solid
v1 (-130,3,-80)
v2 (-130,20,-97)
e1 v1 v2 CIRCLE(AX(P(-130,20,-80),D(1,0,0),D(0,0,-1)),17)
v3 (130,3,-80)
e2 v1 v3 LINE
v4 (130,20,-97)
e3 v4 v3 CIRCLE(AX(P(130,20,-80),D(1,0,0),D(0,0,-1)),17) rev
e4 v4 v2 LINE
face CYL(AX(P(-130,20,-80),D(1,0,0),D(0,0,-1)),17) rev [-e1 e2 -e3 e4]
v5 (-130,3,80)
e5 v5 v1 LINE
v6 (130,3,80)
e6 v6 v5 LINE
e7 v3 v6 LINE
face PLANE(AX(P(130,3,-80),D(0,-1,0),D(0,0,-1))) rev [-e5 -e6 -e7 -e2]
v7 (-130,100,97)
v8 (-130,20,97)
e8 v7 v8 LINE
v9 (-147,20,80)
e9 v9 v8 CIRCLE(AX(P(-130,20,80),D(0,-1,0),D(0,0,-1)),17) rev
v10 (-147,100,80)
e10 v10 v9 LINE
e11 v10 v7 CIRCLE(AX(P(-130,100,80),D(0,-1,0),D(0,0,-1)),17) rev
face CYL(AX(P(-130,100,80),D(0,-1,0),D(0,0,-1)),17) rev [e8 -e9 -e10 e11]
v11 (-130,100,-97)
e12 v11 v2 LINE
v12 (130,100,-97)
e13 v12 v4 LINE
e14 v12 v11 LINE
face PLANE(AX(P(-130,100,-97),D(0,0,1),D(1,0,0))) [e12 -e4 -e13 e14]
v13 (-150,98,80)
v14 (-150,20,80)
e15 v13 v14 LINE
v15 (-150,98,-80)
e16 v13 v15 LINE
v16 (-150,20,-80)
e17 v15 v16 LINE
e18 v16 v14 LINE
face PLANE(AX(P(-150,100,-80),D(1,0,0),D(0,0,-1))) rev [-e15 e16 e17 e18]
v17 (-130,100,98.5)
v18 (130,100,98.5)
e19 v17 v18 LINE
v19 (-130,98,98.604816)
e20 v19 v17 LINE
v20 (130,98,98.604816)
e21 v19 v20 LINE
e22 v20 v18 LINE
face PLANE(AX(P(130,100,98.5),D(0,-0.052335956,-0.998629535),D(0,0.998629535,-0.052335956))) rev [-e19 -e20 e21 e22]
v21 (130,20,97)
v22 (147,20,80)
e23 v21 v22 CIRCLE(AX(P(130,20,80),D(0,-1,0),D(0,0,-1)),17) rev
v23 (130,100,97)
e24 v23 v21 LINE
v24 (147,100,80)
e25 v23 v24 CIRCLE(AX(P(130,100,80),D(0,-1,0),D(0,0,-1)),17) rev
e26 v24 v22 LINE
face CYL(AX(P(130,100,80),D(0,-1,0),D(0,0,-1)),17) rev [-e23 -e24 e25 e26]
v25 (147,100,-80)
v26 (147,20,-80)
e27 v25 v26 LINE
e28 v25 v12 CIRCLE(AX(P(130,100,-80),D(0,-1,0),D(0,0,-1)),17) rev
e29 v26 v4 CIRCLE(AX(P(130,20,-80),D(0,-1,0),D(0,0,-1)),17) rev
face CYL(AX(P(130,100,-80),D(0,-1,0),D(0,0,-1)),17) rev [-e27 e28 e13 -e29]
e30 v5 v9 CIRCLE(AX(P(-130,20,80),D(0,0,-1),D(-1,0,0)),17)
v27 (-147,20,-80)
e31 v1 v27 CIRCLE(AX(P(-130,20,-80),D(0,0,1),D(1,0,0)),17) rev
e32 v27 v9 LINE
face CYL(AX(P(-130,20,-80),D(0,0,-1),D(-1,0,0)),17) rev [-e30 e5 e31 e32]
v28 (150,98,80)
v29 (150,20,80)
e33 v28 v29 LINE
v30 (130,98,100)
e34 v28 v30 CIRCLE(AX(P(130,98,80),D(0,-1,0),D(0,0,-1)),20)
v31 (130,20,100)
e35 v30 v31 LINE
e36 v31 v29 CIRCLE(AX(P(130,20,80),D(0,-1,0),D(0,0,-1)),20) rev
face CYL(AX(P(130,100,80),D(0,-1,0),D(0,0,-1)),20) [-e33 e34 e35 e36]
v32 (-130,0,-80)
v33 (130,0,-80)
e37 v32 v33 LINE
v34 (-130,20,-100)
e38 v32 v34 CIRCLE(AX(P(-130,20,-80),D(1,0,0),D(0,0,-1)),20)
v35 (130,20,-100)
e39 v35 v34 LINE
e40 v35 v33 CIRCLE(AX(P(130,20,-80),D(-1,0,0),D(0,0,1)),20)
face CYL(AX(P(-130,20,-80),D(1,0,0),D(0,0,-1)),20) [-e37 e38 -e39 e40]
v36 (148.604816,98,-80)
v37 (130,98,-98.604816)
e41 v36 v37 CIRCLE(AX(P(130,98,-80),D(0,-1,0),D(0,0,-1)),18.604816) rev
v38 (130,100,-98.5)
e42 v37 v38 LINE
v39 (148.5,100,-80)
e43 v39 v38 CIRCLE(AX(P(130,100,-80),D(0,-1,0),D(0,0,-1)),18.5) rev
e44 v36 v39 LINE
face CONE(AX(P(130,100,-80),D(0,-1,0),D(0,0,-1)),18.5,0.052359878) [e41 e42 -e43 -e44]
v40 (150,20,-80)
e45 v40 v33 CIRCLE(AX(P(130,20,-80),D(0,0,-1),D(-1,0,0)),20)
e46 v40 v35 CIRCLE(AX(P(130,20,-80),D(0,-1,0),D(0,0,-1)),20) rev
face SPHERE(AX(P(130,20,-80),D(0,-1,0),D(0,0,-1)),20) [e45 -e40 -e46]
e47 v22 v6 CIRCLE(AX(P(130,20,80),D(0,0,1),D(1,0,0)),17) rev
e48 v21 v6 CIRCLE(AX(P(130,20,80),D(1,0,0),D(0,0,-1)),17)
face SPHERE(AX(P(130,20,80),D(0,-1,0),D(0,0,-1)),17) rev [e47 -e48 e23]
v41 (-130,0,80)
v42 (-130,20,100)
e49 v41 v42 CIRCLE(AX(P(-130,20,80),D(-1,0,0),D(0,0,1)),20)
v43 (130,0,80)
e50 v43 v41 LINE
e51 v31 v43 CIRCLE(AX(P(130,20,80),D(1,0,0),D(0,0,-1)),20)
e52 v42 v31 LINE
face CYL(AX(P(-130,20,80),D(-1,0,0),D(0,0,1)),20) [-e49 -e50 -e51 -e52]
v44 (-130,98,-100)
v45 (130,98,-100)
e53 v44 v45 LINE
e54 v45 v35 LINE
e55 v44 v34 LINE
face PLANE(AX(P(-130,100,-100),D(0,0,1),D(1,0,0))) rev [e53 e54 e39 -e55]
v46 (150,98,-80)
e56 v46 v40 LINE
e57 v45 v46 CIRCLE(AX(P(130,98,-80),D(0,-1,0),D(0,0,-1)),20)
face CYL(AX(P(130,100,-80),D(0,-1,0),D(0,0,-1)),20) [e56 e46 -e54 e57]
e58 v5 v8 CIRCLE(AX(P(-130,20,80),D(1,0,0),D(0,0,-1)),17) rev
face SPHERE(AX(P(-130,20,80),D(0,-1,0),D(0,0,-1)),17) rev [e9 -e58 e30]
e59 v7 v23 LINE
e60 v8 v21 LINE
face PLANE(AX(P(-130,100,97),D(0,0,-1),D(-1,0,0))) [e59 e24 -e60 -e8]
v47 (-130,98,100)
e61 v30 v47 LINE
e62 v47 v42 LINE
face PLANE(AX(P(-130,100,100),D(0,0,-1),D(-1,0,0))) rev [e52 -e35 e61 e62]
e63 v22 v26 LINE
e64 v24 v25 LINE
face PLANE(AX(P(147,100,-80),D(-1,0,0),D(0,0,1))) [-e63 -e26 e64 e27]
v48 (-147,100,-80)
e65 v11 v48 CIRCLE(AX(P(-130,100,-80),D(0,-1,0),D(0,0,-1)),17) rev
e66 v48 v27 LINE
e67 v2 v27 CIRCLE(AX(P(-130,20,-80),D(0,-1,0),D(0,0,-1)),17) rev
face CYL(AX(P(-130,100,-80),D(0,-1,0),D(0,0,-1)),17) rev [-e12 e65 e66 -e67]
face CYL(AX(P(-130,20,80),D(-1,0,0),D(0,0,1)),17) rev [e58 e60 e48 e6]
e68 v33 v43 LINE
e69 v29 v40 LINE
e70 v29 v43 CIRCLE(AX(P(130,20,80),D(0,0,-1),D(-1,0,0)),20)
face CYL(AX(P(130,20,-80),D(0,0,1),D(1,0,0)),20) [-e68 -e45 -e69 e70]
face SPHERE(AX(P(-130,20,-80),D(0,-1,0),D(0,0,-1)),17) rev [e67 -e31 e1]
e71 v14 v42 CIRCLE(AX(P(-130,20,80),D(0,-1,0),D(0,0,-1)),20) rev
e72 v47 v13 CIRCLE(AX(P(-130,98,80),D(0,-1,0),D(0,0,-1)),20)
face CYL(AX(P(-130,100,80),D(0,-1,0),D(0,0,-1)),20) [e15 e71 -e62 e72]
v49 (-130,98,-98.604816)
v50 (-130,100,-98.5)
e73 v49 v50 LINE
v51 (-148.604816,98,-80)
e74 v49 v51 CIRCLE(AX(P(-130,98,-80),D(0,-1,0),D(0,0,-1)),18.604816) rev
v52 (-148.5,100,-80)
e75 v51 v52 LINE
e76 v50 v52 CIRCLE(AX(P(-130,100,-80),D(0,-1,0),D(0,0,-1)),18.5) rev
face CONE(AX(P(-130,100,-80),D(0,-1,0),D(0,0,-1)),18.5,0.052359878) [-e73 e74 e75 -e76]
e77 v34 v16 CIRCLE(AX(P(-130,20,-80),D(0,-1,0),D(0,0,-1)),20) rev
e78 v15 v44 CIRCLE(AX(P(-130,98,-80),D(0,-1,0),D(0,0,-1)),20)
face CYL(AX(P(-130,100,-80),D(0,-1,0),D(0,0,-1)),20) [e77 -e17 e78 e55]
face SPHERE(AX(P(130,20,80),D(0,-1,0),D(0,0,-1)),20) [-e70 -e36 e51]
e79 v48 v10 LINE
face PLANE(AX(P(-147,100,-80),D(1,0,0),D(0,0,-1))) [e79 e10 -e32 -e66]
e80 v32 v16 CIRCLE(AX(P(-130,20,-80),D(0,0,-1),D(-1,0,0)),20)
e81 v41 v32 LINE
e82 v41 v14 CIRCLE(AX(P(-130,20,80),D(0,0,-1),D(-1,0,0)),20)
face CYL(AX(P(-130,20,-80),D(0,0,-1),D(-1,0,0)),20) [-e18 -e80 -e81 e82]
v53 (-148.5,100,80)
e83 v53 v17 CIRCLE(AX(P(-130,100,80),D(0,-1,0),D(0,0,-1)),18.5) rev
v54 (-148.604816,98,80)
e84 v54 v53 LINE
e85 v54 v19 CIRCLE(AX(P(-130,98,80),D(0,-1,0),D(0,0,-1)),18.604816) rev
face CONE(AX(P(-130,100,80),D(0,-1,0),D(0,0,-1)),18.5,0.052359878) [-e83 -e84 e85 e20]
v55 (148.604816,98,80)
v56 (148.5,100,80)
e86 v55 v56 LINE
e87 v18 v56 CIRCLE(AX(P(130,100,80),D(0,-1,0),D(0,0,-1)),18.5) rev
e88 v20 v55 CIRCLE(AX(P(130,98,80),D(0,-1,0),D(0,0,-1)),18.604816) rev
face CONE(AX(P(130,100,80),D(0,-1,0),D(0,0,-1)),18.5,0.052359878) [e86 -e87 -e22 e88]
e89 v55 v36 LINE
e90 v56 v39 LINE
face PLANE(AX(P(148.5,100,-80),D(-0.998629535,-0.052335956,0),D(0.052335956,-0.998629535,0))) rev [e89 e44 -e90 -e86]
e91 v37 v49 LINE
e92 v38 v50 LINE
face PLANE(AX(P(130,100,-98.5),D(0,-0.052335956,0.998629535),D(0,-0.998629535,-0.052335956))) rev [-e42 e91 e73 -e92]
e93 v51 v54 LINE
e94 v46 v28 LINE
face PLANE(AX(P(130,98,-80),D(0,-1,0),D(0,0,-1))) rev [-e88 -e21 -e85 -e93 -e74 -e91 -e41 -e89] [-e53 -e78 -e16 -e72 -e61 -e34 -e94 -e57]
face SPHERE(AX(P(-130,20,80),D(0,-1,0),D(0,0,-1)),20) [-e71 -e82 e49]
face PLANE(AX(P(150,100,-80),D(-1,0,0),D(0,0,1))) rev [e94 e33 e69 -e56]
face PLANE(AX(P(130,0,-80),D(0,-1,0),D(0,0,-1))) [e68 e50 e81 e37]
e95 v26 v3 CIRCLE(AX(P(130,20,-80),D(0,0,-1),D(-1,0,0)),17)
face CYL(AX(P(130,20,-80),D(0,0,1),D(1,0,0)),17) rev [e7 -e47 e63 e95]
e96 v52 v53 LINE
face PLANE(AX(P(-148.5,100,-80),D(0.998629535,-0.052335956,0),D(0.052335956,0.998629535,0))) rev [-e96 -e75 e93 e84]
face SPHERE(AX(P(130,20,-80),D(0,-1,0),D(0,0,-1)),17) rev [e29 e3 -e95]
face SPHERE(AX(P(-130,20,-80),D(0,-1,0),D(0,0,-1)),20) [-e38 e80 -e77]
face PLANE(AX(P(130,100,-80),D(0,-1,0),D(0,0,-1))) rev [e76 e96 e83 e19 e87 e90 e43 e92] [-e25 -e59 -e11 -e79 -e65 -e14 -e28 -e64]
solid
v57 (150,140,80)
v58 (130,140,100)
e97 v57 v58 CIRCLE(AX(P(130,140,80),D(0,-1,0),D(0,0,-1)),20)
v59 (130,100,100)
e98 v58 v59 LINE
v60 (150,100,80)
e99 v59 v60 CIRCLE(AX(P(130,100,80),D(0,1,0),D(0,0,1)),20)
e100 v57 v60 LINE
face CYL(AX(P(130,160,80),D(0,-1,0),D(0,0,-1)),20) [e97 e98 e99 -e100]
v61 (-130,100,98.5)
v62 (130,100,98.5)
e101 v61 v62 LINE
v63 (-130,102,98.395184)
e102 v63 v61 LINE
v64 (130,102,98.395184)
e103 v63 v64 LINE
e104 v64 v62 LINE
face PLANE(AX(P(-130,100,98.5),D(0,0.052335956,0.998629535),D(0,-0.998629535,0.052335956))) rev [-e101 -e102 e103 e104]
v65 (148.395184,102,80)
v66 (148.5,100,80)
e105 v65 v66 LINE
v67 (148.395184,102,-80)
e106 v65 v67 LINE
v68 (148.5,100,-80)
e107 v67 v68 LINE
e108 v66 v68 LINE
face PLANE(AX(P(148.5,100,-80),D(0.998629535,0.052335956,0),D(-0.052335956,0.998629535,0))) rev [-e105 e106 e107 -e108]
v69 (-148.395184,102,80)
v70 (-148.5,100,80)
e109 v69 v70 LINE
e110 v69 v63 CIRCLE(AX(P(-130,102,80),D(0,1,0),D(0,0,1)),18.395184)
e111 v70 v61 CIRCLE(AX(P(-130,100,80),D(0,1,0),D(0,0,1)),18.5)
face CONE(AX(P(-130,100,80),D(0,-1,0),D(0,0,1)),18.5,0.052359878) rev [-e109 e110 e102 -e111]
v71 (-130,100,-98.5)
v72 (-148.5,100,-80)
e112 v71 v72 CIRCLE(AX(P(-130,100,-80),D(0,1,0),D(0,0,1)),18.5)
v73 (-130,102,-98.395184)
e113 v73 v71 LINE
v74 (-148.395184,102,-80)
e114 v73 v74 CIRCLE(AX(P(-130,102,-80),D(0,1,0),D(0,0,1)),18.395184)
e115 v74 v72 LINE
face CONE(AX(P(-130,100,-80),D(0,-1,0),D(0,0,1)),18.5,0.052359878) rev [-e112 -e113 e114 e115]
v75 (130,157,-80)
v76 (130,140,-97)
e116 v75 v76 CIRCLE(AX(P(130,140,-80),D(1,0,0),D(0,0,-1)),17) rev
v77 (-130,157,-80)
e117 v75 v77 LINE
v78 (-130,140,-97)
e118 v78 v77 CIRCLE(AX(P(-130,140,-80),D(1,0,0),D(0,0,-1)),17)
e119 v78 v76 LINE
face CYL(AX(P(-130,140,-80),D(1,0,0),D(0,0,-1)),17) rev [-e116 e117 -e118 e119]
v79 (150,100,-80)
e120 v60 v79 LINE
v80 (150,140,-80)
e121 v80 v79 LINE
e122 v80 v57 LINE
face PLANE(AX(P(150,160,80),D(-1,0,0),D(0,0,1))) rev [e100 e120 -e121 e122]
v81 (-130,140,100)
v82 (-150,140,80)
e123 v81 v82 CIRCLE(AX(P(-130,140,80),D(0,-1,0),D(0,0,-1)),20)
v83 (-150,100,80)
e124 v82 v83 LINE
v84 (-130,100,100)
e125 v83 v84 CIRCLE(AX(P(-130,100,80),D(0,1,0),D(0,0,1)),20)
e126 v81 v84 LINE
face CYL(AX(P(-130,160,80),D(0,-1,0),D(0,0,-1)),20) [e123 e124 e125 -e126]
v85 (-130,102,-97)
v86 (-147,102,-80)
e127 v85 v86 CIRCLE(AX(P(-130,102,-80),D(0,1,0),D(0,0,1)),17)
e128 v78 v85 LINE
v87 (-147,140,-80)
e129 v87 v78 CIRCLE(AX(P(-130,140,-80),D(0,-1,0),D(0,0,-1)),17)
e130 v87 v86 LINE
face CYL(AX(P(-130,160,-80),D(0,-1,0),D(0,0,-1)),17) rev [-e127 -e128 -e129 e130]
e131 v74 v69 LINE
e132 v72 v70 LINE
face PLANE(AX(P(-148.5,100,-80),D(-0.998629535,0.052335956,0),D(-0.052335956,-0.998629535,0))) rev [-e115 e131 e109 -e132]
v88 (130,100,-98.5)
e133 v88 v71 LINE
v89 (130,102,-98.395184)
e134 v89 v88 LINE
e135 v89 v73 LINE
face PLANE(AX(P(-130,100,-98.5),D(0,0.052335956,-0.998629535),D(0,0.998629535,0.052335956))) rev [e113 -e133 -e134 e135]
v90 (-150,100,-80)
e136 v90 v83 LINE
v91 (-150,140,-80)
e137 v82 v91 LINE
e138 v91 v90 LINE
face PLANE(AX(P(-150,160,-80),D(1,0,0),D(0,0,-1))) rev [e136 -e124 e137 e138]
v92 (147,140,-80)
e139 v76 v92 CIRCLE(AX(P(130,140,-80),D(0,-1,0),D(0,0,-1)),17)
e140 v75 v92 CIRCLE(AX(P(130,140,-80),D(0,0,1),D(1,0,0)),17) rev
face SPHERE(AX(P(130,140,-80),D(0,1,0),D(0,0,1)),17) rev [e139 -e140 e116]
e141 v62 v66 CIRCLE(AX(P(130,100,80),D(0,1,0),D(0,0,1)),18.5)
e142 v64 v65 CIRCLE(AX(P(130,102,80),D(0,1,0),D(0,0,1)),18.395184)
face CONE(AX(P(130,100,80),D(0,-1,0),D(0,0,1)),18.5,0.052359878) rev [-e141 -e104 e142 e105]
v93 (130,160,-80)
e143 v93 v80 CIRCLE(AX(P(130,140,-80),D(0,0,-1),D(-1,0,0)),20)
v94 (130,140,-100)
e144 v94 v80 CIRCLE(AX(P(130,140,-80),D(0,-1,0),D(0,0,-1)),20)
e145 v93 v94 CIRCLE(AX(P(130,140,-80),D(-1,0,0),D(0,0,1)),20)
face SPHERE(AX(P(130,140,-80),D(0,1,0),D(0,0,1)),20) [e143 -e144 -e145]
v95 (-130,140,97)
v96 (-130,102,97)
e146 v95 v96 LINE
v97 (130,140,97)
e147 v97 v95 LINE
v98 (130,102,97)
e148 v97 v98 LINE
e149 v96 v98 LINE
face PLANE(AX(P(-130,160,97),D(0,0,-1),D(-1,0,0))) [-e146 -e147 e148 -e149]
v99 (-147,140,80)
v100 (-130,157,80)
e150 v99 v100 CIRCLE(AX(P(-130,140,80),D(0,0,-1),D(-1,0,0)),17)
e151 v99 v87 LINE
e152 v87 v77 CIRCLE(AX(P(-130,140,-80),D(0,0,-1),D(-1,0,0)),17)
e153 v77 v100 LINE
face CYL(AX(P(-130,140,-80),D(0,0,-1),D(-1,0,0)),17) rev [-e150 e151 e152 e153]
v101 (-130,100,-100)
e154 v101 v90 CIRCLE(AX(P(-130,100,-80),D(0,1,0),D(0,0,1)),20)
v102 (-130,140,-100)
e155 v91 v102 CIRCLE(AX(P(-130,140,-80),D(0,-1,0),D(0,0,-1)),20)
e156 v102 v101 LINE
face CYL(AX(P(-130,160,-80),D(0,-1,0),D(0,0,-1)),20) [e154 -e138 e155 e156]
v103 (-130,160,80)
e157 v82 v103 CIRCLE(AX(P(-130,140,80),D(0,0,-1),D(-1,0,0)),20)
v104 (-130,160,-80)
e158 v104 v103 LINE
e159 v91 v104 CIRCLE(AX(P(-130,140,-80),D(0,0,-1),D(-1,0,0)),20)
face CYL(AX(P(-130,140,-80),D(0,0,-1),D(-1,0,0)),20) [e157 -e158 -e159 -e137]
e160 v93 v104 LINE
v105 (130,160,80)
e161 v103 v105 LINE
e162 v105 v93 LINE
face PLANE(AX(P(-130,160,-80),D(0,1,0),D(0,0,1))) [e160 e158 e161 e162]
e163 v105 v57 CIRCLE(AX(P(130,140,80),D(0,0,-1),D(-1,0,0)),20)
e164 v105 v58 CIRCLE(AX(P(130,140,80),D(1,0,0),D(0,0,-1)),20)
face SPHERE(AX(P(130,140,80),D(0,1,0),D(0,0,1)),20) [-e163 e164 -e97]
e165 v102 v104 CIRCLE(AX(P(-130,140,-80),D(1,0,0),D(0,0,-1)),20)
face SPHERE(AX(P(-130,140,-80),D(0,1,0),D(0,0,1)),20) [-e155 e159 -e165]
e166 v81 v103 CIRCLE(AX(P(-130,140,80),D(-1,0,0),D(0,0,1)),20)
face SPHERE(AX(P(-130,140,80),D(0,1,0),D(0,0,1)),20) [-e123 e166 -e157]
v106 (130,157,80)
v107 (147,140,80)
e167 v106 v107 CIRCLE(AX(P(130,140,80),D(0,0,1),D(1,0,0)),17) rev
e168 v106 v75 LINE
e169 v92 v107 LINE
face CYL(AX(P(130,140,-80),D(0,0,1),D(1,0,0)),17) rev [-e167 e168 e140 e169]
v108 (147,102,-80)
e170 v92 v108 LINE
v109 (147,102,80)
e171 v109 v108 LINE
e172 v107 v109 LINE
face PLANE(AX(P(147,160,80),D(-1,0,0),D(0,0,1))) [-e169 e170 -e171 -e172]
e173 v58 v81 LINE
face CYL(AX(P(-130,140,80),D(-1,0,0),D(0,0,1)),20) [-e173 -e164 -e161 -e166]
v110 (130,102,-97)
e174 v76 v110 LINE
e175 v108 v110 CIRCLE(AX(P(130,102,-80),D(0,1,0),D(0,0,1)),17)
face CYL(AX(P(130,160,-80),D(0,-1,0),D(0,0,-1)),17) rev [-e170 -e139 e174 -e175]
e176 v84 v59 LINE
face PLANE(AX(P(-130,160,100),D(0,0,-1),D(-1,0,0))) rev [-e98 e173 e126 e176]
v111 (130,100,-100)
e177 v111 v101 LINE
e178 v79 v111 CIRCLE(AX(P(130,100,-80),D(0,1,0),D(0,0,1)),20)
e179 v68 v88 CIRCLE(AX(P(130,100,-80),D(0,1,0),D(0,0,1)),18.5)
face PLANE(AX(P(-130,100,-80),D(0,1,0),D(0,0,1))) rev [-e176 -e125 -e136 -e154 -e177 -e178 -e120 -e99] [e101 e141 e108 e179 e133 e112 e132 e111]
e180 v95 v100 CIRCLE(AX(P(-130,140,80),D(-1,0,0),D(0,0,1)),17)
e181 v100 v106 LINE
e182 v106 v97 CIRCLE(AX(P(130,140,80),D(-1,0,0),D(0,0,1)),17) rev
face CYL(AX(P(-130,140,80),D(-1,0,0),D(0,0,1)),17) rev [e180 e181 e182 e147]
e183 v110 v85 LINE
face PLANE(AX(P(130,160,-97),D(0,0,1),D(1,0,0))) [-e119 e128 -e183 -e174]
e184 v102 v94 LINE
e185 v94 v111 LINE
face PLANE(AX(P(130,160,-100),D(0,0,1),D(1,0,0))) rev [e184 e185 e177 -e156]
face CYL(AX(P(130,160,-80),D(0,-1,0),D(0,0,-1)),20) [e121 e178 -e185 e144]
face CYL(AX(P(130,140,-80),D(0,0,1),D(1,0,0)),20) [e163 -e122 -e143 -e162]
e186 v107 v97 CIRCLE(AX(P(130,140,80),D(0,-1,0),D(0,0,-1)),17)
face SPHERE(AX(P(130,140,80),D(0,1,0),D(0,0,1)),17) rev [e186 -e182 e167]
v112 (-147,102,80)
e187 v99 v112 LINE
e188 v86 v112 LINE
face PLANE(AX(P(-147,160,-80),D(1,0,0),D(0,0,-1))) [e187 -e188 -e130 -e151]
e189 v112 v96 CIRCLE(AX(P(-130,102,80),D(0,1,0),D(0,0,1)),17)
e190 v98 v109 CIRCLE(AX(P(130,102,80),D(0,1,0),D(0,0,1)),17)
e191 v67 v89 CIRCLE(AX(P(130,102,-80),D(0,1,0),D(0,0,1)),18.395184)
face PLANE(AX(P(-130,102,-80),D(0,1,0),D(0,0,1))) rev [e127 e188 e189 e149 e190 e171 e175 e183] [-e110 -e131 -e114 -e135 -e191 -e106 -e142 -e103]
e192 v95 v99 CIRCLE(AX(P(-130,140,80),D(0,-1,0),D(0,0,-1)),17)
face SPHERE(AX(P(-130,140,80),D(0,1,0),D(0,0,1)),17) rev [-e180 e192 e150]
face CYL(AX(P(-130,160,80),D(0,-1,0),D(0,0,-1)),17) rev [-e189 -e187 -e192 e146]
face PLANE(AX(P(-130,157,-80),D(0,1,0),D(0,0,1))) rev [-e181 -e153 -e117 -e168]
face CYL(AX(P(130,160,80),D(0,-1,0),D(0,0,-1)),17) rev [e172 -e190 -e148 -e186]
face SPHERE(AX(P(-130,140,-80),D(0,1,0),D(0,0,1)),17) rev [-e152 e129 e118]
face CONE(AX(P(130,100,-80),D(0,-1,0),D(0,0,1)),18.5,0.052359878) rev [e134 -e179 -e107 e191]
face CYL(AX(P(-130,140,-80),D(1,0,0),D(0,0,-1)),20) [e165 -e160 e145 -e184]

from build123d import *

# Parameters (mm, degrees)
BOSS_EXTRUDE1_DEPTH    = 100
FILLET1_R              = 20
SHELL1_T               = -3
BOSS_EXTRUDE2_DEPTH    = 60
FILLET2_R              = 20
SHELL3_T               = -3
SELECT_FEATURES1_DEPTH = 2
SELECT_FEATURES1_TAPER = -3


with BuildPart() as part:
    # Sketch1 → Boss-Extrude1 (new body)
    with BuildSketch(Plane(origin=(0, 0, 0), x_dir=(1, 0, 0), z_dir=(0, 1, 0))):
        with BuildLine():
            Line((-130, 100), (130, 100))
            ThreePointArc((130, 100), (144.142135624, 94.142135624), (150, 80))
            Line((150, 80), (150, -80))
            ThreePointArc((150, -80), (144.142135624, -94.142135624), (130, -100))
            Line((130, -100), (-130, -100))
            ThreePointArc((-130, -100), (-144.142135624, -94.142135624), (-150, -80))
            Line((-150, -80), (-150, 80))
            ThreePointArc((-150, 80), (-144.142135624, 94.142135624), (-130, 100))
        make_face()
    extrude(amount=BOSS_EXTRUDE1_DEPTH)

    # Fillet1
    fillet1_edges = [part.edges().sort_by_distance(p)[0] for p in [
        (-150, 0, 0),
        (-144.142135624, 0, -94.142135624),
        (0, 0, -100),
        (144.142135624, 0, -94.142135624),
        (150, 0, 0),
        (144.142135624, 0, 94.142135624),
        (0, 0, 100),
        (-144.142135624, 0, 94.142135624),
    ]]
    fillet(fillet1_edges, radius=FILLET1_R)

    # Shell1
    shell1_openings = [part.faces().sort_by_distance(p)[0] for p in [
        (0, 100, 0),
    ]]
    offset(amount=SHELL1_T, openings=shell1_openings, kind=Kind.INTERSECTION)

    # Select Features1: read off the stored shape, not the designer's step
    # Select Features1 outline → Select Features1 (cut)
    with BuildSketch(Plane(origin=(0, 98, 0), x_dir=(1, 0, 0), z_dir=(0, 1, 0))):
        with BuildLine():
            Line((130, 100), (-130, 100))
            ThreePointArc((-130, 100), (-144.142135624, 94.142135624), (-150, 80))
            Line((-150, 80), (-150, -80))
            ThreePointArc((-150, -80), (-144.142135624, -94.142135624), (-130, -100))
            Line((-130, -100), (130, -100))
            ThreePointArc((130, -100), (144.142135624, -94.142135624), (150, -80))
            Line((150, -80), (150, 80))
            ThreePointArc((150, 80), (144.142135624, 94.142135624), (130, 100))
        make_face()
        with BuildLine():
            Line((-130, 98.604815559), (130, 98.604815559))
            ThreePointArc((130, 98.604815559), (143.155591244, 93.155591244), (148.604815559, 80))
            Line((148.604815559, 80), (148.604815559, -80))
            ThreePointArc((148.604815559, -80), (143.155591244, -93.155591244), (130, -98.604815559))
            Line((130, -98.604815559), (-130, -98.604815559))
            ThreePointArc((-130, -98.604815559), (-143.155591244, -93.155591244), (-148.604815559, -80))
            Line((-148.604815559, -80), (-148.604815559, 80))
            ThreePointArc((-148.604815559, 80), (-143.155591244, 93.155591244), (-130, 98.604815559))
        make_face(mode=Mode.SUBTRACT)
    extrude(amount=SELECT_FEATURES1_DEPTH, taper=SELECT_FEATURES1_TAPER, mode=Mode.SUBTRACT)


with BuildPart() as body_2:
    # Sketch2 → Boss-Extrude2 (new body)
    with BuildSketch(Plane(origin=(0, 100, 0), x_dir=(1, 0, 0), z_dir=(0, 1, 0))):
        with BuildLine():
            Line((130, 100), (-130, 100))
            ThreePointArc((-130, 100), (-144.142135624, 94.142135624), (-150, 80))
            Line((-150, 80), (-150, -80))
            ThreePointArc((-150, -80), (-144.142135624, -94.142135624), (-130, -100))
            Line((-130, -100), (130, -100))
            ThreePointArc((130, -100), (144.142135624, -94.142135624), (150, -80))
            Line((150, -80), (150, 80))
            ThreePointArc((150, 80), (144.142135624, 94.142135624), (130, 100))
        make_face()
    extrude(amount=BOSS_EXTRUDE2_DEPTH)

    # Fillet2
    fillet2_edges = [body_2.edges().sort_by_distance(p)[0] for p in [
        (-144.142135624, 160, 94.142135624),
        (0, 160, 100),
        (144.142135624, 160, 94.142135624),
        (150, 160, 0),
        (144.142135624, 160, -94.142135624),
        (0, 160, -100),
        (-144.142135624, 160, -94.142135624),
        (-150, 160, 0),
    ]]
    fillet(fillet2_edges, radius=FILLET2_R)

    # Shell3
    shell3_openings = [body_2.faces().sort_by_distance(p)[0] for p in [
        (0, 100, 0),
    ]]
    offset(amount=SHELL3_T, openings=shell3_openings, kind=Kind.INTERSECTION)

    # Groove2: read off the stored shape, not the designer's step
    # Groove2: loft between two sections, ruled curve by curve
    groove2_from = [
        Edge.make_three_point_arc((-148.395184441, 102, -80), (-143.00735966, 102, -93.00735966), (-130, 102, -98.395184441)),
        Edge.make_three_point_arc((130, 102, -98.395184441), (143.00735966, 102, -93.00735966), (148.395184441, 102, -80)),
        Edge.make_three_point_arc((148.395184441, 102, 80), (143.00735966, 102, 93.00735966), (130, 102, 98.395184441)),
        Edge.make_three_point_arc((-130, 102, 98.395184441), (-143.00735966, 102, 93.00735966), (-148.395184441, 102, 80)),
        Edge.make_line((-148.395184441, 102, -80), (-148.395184441, 102, 80)),
        Edge.make_line((130, 102, -98.395184441), (-130, 102, -98.395184441)),
        Edge.make_line((148.395184441, 102, 80), (148.395184441, 102, -80)),
        Edge.make_line((-130, 102, 98.395184441), (130, 102, 98.395184441)),
    ]
    groove2_to = [
        Edge.make_three_point_arc((-148.5, 100, -80), (-143.081475452, 100, -93.081475452), (-130, 100, -98.5)),
        Edge.make_three_point_arc((130, 100, -98.5), (143.081475452, 100, -93.081475452), (148.5, 100, -80)),
        Edge.make_three_point_arc((148.5, 100, 80), (143.081475452, 100, 93.081475452), (130, 100, 98.5)),
        Edge.make_three_point_arc((-130, 100, 98.5), (-143.081475452, 100, 93.081475452), (-148.5, 100, 80)),
        Edge.make_line((-148.5, 100, -80), (-148.5, 100, 80)),
        Edge.make_line((130, 100, -98.5), (-130, 100, -98.5)),
        Edge.make_line((148.5, 100, 80), (148.5, 100, -80)),
        Edge.make_line((-130, 100, 98.5), (130, 100, 98.5)),
    ]
    groove2 = Solid(Shell([*[Face.make_surface_from_curves(groove2_from[k], groove2_to[k]) for k in range(8)], Face(Wire(groove2_from)), Face(Wire(groove2_to))]))
    add(groove2, mode=Mode.SUBTRACT)


solid = Compound([part.part, body_2.part])
